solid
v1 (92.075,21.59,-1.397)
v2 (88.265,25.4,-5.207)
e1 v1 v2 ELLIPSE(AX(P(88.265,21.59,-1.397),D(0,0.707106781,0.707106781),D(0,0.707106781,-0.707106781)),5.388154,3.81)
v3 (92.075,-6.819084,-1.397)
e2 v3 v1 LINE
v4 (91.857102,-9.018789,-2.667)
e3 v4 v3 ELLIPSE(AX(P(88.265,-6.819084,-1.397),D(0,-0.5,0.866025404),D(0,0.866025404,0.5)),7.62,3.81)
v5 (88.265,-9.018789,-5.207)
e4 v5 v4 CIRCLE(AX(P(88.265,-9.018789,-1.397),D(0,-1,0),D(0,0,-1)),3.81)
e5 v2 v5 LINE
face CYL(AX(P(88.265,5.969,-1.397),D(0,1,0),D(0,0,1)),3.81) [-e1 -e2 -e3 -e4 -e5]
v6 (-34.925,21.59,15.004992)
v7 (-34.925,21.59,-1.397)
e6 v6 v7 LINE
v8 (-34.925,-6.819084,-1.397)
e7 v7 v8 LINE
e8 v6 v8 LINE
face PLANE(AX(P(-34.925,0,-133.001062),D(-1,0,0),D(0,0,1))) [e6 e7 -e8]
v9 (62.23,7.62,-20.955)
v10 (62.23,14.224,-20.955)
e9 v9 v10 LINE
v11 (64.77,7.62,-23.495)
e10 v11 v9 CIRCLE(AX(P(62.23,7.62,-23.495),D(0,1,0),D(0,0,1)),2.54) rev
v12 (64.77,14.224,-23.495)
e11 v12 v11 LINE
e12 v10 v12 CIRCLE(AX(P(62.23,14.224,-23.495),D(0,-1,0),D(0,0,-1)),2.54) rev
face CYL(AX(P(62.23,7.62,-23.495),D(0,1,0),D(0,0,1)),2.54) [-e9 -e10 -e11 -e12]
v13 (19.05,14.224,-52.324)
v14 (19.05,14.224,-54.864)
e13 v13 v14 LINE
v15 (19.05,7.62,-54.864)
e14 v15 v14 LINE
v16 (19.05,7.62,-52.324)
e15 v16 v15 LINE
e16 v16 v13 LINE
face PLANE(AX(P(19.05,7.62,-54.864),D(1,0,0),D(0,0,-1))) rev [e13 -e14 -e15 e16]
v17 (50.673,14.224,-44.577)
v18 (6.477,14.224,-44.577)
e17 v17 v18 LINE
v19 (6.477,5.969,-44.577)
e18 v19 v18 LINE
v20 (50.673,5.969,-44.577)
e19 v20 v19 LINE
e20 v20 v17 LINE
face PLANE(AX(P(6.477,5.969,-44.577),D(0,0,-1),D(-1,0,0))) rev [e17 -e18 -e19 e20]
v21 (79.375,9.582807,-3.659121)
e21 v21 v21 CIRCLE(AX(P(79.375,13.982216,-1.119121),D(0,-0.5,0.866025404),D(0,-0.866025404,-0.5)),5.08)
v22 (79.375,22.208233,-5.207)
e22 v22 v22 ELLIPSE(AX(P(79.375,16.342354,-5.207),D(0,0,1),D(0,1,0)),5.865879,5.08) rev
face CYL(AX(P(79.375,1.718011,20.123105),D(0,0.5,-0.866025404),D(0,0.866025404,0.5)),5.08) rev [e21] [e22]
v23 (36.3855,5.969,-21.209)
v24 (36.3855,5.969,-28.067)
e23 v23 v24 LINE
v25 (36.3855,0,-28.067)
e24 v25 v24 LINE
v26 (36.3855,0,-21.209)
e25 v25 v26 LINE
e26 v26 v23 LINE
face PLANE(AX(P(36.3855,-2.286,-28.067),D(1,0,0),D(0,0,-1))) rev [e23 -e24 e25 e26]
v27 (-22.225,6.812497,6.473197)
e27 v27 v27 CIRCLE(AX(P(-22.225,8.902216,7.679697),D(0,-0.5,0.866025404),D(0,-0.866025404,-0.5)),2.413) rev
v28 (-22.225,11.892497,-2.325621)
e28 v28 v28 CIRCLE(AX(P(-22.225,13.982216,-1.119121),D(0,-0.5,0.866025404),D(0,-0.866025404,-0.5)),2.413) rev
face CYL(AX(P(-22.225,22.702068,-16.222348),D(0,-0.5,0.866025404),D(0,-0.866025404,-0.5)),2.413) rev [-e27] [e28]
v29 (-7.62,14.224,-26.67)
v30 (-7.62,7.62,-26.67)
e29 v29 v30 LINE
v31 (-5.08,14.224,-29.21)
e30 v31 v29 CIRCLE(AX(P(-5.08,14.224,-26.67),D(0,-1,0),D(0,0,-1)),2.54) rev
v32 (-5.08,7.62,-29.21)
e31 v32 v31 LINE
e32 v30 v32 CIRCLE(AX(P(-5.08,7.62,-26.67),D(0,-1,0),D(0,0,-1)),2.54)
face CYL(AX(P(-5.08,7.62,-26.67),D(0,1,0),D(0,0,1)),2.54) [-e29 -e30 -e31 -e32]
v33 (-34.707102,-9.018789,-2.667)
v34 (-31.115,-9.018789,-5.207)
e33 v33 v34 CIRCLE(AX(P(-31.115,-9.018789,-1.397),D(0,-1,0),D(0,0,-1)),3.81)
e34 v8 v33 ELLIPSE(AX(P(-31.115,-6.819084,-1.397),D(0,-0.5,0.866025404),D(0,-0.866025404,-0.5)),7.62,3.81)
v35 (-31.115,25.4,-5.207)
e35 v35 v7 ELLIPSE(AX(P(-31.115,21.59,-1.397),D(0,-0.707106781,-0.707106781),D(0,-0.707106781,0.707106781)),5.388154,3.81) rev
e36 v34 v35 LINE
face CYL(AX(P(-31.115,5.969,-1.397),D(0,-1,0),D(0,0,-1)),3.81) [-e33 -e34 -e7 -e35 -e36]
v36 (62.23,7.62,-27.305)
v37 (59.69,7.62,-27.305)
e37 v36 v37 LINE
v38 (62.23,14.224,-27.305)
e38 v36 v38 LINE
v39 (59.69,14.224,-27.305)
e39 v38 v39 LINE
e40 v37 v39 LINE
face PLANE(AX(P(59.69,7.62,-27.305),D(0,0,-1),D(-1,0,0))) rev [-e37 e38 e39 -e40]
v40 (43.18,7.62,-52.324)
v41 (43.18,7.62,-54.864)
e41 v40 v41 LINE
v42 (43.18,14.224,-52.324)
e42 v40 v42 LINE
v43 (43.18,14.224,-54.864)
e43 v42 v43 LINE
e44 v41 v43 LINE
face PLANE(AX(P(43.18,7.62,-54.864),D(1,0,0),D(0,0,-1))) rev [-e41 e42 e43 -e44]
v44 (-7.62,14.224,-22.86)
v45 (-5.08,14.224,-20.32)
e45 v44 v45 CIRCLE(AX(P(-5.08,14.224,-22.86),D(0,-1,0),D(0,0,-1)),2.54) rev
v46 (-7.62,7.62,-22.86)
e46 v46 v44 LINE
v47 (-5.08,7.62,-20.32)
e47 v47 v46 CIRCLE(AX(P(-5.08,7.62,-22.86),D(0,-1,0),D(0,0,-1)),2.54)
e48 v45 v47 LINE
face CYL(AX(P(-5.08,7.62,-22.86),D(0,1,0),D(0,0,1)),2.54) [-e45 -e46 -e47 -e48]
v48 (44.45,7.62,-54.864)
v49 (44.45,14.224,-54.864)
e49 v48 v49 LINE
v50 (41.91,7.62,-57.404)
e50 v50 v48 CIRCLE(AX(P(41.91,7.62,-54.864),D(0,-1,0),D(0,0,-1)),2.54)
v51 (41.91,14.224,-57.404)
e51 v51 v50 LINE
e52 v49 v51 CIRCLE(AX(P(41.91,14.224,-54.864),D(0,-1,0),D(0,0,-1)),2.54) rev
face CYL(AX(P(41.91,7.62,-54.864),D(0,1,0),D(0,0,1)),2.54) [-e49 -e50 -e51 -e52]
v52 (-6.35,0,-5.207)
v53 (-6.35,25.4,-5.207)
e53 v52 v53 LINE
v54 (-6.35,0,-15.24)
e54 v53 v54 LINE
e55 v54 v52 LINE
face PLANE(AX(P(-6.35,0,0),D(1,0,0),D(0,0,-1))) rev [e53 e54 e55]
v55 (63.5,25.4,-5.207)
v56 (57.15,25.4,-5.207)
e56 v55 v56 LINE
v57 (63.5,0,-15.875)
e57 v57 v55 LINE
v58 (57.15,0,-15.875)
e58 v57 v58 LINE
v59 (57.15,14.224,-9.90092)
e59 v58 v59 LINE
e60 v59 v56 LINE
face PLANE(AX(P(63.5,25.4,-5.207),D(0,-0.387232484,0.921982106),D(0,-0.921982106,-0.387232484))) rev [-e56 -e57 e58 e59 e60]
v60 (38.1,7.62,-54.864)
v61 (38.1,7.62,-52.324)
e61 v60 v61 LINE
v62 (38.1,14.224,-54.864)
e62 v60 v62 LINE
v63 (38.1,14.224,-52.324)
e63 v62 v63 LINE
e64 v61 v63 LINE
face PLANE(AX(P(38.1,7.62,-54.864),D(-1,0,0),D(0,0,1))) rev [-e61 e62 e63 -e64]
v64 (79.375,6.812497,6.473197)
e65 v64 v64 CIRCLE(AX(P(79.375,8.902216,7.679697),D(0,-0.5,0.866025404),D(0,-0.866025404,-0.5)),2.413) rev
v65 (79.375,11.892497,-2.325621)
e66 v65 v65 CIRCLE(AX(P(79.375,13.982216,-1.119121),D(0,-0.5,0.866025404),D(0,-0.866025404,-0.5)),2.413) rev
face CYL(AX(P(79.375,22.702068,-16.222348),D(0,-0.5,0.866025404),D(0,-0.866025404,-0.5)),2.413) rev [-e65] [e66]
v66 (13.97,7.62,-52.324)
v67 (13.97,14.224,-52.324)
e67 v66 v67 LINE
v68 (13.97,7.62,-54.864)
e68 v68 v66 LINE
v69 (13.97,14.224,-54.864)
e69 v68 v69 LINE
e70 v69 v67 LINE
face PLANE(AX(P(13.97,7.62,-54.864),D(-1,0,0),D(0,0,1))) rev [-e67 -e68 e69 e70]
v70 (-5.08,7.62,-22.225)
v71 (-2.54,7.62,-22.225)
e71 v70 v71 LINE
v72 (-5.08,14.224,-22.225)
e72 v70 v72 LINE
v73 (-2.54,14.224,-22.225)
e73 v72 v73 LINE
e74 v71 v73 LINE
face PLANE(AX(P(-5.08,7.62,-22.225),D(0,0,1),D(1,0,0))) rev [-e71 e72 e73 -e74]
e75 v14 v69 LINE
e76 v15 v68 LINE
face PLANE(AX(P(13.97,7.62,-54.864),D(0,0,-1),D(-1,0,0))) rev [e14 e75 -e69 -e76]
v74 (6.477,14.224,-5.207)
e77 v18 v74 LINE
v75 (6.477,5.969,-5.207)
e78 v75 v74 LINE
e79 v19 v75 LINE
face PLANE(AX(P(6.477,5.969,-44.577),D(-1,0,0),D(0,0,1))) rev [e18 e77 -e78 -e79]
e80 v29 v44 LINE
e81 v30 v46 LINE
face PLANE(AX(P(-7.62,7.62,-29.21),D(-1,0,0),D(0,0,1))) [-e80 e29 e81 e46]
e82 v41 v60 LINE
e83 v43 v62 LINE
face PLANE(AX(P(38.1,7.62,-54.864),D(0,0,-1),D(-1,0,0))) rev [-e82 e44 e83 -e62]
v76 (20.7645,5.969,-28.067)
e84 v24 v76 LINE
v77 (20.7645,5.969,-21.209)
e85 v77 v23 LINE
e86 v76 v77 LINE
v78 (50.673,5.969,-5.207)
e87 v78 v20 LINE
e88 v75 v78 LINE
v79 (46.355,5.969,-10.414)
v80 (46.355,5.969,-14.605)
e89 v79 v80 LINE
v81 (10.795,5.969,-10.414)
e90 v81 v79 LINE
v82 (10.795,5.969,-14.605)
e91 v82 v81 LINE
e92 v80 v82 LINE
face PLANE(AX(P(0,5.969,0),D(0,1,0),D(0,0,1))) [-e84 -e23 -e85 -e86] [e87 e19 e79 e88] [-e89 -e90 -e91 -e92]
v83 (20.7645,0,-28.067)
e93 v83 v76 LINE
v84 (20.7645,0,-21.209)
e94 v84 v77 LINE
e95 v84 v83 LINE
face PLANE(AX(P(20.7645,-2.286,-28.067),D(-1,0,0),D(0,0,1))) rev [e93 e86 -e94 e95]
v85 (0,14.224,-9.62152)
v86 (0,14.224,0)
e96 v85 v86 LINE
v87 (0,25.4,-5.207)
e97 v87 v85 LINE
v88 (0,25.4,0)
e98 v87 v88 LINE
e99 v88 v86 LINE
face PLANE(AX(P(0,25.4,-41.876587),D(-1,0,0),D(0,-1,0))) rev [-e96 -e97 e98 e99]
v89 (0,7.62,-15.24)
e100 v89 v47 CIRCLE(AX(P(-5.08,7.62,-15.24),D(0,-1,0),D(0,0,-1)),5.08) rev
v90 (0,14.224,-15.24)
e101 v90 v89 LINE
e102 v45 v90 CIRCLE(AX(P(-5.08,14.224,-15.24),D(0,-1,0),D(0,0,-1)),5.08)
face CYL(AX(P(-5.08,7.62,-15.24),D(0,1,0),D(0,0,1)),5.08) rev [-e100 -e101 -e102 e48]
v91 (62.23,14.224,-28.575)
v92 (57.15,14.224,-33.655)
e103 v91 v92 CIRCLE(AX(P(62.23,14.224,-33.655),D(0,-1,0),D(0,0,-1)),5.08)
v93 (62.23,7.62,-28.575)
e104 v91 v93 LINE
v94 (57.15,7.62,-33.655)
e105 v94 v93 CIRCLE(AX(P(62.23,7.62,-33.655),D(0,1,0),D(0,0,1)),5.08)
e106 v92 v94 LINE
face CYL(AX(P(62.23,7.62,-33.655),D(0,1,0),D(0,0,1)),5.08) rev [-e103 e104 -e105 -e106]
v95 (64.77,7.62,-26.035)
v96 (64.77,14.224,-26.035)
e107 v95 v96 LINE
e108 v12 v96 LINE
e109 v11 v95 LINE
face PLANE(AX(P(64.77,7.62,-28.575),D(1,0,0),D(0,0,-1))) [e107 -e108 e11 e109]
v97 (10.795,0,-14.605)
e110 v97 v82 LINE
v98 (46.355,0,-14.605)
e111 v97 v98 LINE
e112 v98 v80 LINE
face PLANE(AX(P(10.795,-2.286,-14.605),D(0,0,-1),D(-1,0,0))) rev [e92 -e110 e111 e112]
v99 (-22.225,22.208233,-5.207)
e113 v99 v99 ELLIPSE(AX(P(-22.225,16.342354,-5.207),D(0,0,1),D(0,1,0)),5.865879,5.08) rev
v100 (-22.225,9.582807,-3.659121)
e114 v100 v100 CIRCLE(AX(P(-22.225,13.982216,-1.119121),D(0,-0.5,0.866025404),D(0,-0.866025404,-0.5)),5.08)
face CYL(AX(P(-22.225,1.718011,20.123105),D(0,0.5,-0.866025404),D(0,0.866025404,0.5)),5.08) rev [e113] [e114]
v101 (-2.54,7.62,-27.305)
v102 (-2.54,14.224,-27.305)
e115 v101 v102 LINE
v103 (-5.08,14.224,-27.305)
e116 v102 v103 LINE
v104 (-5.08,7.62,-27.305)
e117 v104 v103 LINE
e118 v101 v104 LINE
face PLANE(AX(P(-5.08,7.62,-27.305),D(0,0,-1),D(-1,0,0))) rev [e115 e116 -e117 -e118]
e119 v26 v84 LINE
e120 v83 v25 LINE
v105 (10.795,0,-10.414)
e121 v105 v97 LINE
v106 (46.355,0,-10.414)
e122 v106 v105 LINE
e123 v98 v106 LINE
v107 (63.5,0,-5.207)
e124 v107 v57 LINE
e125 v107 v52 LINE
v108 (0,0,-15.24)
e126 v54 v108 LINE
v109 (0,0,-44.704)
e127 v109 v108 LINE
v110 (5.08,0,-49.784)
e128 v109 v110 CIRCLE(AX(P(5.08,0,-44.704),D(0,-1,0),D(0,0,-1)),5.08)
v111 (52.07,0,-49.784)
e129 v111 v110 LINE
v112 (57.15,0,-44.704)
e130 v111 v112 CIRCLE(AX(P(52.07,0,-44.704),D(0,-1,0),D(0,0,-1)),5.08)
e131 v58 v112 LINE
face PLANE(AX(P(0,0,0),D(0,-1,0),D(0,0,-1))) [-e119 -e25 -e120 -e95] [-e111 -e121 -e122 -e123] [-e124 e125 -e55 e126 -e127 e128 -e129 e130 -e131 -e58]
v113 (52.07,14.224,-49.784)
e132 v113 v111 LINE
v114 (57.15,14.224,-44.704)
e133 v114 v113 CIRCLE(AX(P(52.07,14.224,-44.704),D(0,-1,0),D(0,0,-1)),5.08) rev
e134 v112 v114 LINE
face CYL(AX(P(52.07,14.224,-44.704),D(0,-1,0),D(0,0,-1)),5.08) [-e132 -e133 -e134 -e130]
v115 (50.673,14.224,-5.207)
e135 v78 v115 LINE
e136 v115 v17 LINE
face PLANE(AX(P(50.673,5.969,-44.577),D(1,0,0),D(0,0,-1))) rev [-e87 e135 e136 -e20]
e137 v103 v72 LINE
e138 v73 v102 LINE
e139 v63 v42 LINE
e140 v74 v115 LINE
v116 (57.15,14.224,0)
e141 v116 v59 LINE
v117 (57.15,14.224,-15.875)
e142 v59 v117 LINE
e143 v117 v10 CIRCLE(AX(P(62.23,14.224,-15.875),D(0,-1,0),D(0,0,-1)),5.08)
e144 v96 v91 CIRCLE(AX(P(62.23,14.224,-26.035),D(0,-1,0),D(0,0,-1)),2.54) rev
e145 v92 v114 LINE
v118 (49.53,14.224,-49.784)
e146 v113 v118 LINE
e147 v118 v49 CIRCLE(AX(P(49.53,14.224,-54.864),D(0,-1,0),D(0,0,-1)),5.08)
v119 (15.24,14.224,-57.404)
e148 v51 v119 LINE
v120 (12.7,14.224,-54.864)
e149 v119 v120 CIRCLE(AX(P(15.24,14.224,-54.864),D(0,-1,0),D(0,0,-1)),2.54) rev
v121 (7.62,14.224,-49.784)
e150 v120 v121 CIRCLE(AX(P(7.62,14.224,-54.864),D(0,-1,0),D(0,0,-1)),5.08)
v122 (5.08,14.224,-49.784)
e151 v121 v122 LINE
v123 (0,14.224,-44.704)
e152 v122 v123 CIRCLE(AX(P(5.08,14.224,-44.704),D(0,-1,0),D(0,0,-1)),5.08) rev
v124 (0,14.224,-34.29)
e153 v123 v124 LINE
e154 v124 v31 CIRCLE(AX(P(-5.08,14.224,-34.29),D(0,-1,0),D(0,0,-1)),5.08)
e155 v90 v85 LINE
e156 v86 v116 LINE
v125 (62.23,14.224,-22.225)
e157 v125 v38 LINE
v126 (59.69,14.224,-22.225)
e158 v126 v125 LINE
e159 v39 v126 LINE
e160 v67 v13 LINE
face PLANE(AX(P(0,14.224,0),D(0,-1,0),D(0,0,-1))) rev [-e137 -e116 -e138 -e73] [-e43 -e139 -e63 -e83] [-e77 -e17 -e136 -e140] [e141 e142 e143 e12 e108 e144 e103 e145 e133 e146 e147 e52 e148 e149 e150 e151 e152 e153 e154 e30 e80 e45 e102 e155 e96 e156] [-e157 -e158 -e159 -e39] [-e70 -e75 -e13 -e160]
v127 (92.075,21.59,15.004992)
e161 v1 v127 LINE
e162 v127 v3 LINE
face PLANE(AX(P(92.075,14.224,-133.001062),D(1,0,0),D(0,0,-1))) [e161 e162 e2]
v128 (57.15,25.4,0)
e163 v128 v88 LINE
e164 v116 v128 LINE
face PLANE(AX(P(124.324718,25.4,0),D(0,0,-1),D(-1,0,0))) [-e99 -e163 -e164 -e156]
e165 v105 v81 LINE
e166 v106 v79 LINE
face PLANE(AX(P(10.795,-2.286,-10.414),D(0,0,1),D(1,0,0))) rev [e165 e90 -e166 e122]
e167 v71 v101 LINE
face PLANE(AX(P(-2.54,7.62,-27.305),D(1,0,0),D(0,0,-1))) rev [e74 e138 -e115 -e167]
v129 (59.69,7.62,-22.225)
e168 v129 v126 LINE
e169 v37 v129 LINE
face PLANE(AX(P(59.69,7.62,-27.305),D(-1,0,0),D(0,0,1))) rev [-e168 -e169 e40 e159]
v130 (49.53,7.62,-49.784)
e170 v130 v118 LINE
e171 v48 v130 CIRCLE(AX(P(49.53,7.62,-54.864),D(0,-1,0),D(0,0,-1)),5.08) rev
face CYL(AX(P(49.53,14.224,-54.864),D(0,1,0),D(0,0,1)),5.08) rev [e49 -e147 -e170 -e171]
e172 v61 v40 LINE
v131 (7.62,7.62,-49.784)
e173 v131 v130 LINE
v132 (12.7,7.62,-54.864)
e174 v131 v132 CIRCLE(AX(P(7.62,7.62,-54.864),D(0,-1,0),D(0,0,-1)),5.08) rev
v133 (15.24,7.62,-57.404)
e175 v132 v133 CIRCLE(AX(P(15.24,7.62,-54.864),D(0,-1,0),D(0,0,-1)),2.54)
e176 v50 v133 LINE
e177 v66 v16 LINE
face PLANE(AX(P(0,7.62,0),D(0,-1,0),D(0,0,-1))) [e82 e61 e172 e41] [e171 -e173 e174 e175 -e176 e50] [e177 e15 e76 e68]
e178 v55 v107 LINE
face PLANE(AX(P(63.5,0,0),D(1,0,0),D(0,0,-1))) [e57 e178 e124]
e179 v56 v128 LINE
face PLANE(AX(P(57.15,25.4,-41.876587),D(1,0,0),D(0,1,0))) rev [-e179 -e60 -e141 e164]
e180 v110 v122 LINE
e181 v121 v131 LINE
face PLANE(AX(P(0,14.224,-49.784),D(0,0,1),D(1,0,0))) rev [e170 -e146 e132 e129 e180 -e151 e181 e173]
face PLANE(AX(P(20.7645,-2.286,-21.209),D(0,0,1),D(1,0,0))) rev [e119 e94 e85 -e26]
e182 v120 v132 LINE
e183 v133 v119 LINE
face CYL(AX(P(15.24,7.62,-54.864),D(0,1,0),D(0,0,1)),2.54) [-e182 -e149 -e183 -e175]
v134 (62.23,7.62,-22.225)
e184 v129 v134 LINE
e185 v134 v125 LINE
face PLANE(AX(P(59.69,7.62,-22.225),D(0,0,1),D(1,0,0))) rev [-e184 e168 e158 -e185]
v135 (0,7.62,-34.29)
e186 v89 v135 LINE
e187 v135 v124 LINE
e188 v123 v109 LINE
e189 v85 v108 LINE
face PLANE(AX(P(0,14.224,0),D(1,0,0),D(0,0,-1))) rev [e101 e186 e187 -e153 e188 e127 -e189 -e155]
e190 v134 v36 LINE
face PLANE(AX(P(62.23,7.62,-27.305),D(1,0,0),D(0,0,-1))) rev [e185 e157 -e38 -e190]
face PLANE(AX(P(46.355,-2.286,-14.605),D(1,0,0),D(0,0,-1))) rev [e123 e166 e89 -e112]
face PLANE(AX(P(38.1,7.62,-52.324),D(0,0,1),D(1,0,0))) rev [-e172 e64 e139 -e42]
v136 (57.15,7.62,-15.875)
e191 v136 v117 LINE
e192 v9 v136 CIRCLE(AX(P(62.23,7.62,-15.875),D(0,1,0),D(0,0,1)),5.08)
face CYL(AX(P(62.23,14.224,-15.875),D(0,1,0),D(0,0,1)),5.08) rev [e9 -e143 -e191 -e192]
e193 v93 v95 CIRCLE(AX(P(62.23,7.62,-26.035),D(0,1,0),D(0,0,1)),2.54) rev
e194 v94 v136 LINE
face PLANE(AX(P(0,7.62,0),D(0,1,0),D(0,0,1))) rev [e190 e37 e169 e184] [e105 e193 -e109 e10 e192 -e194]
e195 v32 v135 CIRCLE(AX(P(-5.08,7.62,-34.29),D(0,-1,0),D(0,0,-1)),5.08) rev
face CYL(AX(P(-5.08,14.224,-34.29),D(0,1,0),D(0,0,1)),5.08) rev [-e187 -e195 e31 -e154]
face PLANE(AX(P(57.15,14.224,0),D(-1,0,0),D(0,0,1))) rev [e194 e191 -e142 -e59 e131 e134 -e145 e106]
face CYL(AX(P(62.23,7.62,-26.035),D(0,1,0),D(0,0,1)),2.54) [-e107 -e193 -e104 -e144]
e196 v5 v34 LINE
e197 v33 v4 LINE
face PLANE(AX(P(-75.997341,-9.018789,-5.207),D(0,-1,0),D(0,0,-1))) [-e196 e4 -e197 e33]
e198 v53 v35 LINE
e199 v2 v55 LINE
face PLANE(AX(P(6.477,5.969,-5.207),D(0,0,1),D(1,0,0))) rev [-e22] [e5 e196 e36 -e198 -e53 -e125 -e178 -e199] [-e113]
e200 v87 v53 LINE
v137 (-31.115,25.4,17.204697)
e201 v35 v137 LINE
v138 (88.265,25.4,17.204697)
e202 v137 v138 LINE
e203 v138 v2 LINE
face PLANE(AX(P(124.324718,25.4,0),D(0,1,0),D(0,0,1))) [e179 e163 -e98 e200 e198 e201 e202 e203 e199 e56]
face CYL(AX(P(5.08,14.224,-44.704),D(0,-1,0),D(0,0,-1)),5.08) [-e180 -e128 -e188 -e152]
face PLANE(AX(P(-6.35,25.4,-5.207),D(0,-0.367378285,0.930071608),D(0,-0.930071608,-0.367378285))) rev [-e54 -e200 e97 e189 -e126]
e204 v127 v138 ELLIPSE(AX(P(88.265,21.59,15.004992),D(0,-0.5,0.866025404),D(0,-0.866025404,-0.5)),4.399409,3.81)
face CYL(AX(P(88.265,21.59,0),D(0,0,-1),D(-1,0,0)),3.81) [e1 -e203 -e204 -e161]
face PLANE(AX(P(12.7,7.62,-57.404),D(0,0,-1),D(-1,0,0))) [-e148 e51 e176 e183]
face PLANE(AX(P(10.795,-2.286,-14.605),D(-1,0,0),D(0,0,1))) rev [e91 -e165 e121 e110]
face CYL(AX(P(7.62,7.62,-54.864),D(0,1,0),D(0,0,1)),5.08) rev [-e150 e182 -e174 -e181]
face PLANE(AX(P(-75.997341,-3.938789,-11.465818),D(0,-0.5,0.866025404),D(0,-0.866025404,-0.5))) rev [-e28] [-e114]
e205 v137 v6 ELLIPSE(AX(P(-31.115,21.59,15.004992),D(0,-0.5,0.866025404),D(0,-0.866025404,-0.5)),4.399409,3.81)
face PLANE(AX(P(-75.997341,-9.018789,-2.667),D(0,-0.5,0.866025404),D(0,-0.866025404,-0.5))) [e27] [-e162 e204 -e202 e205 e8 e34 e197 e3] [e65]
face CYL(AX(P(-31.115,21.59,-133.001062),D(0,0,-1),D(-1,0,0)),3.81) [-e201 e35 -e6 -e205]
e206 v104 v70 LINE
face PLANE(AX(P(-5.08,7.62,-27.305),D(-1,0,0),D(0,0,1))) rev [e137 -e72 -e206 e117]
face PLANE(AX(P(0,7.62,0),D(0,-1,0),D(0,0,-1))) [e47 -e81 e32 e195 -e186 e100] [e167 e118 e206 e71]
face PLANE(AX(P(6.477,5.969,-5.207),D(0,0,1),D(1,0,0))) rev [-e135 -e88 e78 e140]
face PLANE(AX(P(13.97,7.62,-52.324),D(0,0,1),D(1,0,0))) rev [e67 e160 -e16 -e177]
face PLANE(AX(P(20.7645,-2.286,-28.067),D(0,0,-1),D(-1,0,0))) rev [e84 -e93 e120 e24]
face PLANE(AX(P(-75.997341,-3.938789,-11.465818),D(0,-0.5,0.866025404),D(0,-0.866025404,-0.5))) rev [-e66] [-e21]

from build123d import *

# Parameters (mm, degrees)
SKETCH2_W           = 57.15
SKETCH2_H           = 49.784
BOSS_EXTRUDE1_DEPTH = 14.224
SKETCH3_W           = 44.196
SKETCH3_H           = 39.37
CUT_EXTRUDE1_DEPTH  = 8.255
SKETCH4_W           = 35.56
SKETCH4_H           = 4.191
SKETCH4_W_2         = 15.621
SKETCH4_H_2         = 6.858
CUT_EXTRUDE2_DEPTH  = 8.255
SKETCH5_W           = 7.62
SKETCH5_H           = 8.89
SKETCH5_H_2         = 7.62
BOSS_EXTRUDE2_DEPTH = 6.604
SKETCH6_W           = 2.54
SKETCH6_H           = 5.08
SKETCH6_W_2         = 5.08
SKETCH6_H_2         = 2.54
CUT_EXTRUDE3_DEPTH  = 6.604
FILLET1_R           = 5.08
FILLET2_R           = 2.54
SKETCH7_W           = 127
SKETCH7_H           = 14.224
SKETCH7_R           = 2.38125
BOSS_EXTRUDE3_DEPTH = 5.207
BOSS_EXTRUDE4_DEPTH = 127
SKETCH11_W          = 34.925
SKETCH11_H          = 11.176
BOSS_EXTRUDE5_DEPTH = 5.207
SKETCH9_R           = 2.413
CUT_EXTRUDE4_DEPTH  = 25.4
FILLET3_R           = 5.08
FILLET4_R           = 5.08
BOSS_EXTRUDE6_DEPTH = 6.35
BOSS_EXTRUDE7_DEPTH = 6.35
BOSS_EXTRUDE8_DEPTH = 127
BOSS_EXTRUDE9_DEPTH = 127
CUT_EXTRUDE6_START  = -2.199704526
SKETCH16_R          = 2.413
CUT_EXTRUDE6_DEPTH  = 2.199704526
CUT_EXTRUDE9_START  = -17.813215
SKETCH17_R          = 5.08
CUT_EXTRUDE9_DEPTH  = 7.653215
FILLET5_R           = 3.81


with BuildPart() as part:
    # Sketch2 → Boss-Extrude1 (new body)
    with BuildSketch(Plane(origin=(0, 0, 0), x_dir=(1, 0, 0), z_dir=(0, 1, 0))):
        with Locations((28.575, 24.892)):
            Rectangle(SKETCH2_W, SKETCH2_H)
    extrude(amount=BOSS_EXTRUDE1_DEPTH)

    # Sketch3 → Cut-Extrude1 (cut)
    with BuildSketch(Plane(origin=(0, 14.224, 0), x_dir=(1, 0, 0), z_dir=(0, 1, 0))):
        with Locations((28.575, 24.892)):
            Rectangle(SKETCH3_W, SKETCH3_H)
    extrude(amount=-CUT_EXTRUDE1_DEPTH, mode=Mode.SUBTRACT)

    # Sketch4 → Cut-Extrude2 (cut)
    with BuildSketch(Plane(origin=(0, 5.969, 0), x_dir=(1, 0, 0), z_dir=(0, 1, 0))):
        with Locations((28.575, 12.5095)):
            Rectangle(SKETCH4_W, SKETCH4_H)
        with Locations((28.575, 24.638)):
            Rectangle(SKETCH4_W_2, SKETCH4_H_2)
    extrude(amount=-CUT_EXTRUDE2_DEPTH, mode=Mode.SUBTRACT)

    # Sketch5 → Boss-Extrude2 (add)
    with BuildSketch(Plane(origin=(0, 14.224, 0), x_dir=(1, 0, 0), z_dir=(0, 1, 0))):
        with Locations((-3.81, 24.765)):
            Rectangle(SKETCH5_W, SKETCH5_H)
        Polygon((12.7, 49.784), (36.83, 49.784), (44.45, 49.784), (44.45, 57.404), (36.83, 57.404), (12.7, 57.404), align=None)
        with Locations((60.96, 24.765)):
            Rectangle(SKETCH5_W, SKETCH5_H_2)
    extrude(amount=-BOSS_EXTRUDE2_DEPTH)

    # Sketch6 → Cut-Extrude3 (cut)
    with BuildSketch(Plane(origin=(0, 14.224, 0), x_dir=(1, 0, 0), z_dir=(0, 1, 0))):
        with Locations((-3.81, 24.765)):
            Rectangle(SKETCH6_W, SKETCH6_H)
        with Locations((60.96, 24.765)):
            Rectangle(SKETCH6_W, SKETCH6_H)
        with Locations((16.51, 53.594)):
            Rectangle(SKETCH6_W_2, SKETCH6_H_2)
        with Locations((40.64, 53.594)):
            Rectangle(SKETCH6_W_2, SKETCH6_H_2)
    extrude(amount=-CUT_EXTRUDE3_DEPTH, mode=Mode.SUBTRACT)

    # Fillet1
    fillet1_edges = [part.edges().sort_by_distance(p)[0] for p in [
        (0, 7.112, -49.784),
        (57.15, 7.112, -49.784),
        (57.15, 7.112, 0),
        (0, 7.112, 0),
    ]]
    fillet(fillet1_edges, radius=FILLET1_R)

    # Fillet2
    fillet2_edges = [part.edges().sort_by_distance(p)[0] for p in [
        (-7.62, 10.922, -20.32),
        (-7.62, 10.922, -29.21),
        (12.7, 10.922, -57.404),
        (44.45, 10.922, -57.404),
        (64.77, 10.922, -28.575),
        (64.77, 10.922, -20.955),
    ]]
    fillet(fillet2_edges, radius=FILLET2_R)

    # Sketch7 → Boss-Extrude3 (add)
    with BuildSketch(Plane.XY):
        with Locations((28.575, 7.112)):
            Rectangle(SKETCH7_W, SKETCH7_H)
        with Locations((-30.861, 7.112)):
            Circle(SKETCH7_R, mode=Mode.SUBTRACT)
        with Locations((88.011, 7.112)):
            Circle(SKETCH7_R, mode=Mode.SUBTRACT)
    extrude(amount=-BOSS_EXTRUDE3_DEPTH)

    # Sketch8 → Boss-Extrude4 (add)
    with BuildSketch(Plane.ZY.offset(34.925)):
        Polygon((0, 25.4), (14.664696837, 25.4), (0, 0), (-5.207, 0), (-5.207, 14.224), (0, 14.224), align=None)
    extrude(amount=-BOSS_EXTRUDE4_DEPTH)

    # Sketch11 → Boss-Extrude5 (add)
    with BuildSketch(Plane(origin=(0, 0, 0), x_dir=(-1, 0, 0), z_dir=(0, 0, -1))):
        with Locations((17.4625, 19.812)):
            Rectangle(SKETCH11_W, SKETCH11_H)
        with Locations((-74.6125, 19.812)):
            Rectangle(SKETCH11_W, SKETCH11_H)
    extrude(amount=BOSS_EXTRUDE5_DEPTH)

    # Sketch9 → Cut-Extrude4 (cut, symmetric)
    with BuildSketch(Plane(origin=(0, 0, 0), x_dir=(1, 0, 0), z_dir=(0, -0.5000000000000043, 0.8660254037844363))):
        with Locations(Location((-22.225, 11.549393675, 0), (0, 0, 270))):
            Circle(SKETCH9_R)
        with Locations(Location((79.375, 11.549393675, 0), (0, 0, 270))):
            Circle(SKETCH9_R)
    extrude(amount=CUT_EXTRUDE4_DEPTH, both=True, mode=Mode.SUBTRACT)

    # Fillet3
    fillet3_edges = [part.edges().sort_by_distance(p)[0] for p in [
        (44.45, 10.922, -49.784),
        (12.7, 10.922, -49.784),
    ]]
    fillet(fillet3_edges, radius=FILLET3_R - 0.0001)  # a hair under: the kernel refuses the full size

    # Fillet4
    fillet4_edges = [part.edges().sort_by_distance(p)[0] for p in [
        (57.15, 10.922, -20.955),
        (57.15, 10.922, -28.575),
        (0, 10.922, -29.21),
        (0, 10.922, -20.32),
    ]]
    fillet(fillet4_edges, radius=FILLET4_R - 0.0001)  # a hair under: the kernel refuses the full size

    # Sketch12 → Boss-Extrude6 (add)
    with BuildSketch(Plane.ZY):
        Polygon((-5.207, 25.4), (-15.24, 0), (-5.207, 0), align=None)
    extrude(amount=BOSS_EXTRUDE6_DEPTH)

    # Sketch13 → Boss-Extrude7 (add)
    with BuildSketch(Plane(origin=(57.15, 0, 0), x_dir=(0, 0, -1), z_dir=(1, 0, 0))):
        Polygon((5.207, 25.4), (15.875, 0), (5.207, 0), align=None)
    extrude(amount=BOSS_EXTRUDE7_DEPTH)

    # Sketch14 → Boss-Extrude8 (add)
    with BuildSketch(Plane.ZY.offset(34.925)):
        Polygon((-5.207, 0), (-5.207, -9.018788555), (0, 0), align=None)
    extrude(amount=-BOSS_EXTRUDE8_DEPTH)

    # Sketch15 → Boss-Extrude9 (add)
    with BuildSketch(Plane(origin=(92.075, 0, 0), x_dir=(0, 0, -1), z_dir=(1, 0, 0))):
        Polygon((5.207, -9.018788555), (2.667, -9.018788555), (-17.204696837, 25.4), (-14.664696837, 25.4), align=None)
    extrude(amount=-BOSS_EXTRUDE9_DEPTH)

    # Sketch16 → Cut-Extrude6 (cut)
    with BuildSketch(Plane(origin=(0, 0, 0), x_dir=(-1, 0, 0), z_dir=(0, 0.5000000000000031, -0.8660254037844369)).offset(CUT_EXTRUDE6_START)):
        with Locations(Location((-79.375, 11.549393675, 0), (0, 0, 270))):
            Circle(SKETCH16_R)
        with Locations(Location((22.225, 11.549393675, 0), (0, 0, 270))):
            Circle(SKETCH16_R)
    extrude(amount=CUT_EXTRUDE6_DEPTH, mode=Mode.SUBTRACT)

    # Sketch17 → Cut-Extrude9 (cut)
    with BuildSketch(Plane(origin=(0, -1.099852263, 1.905), x_dir=(1, 0, 0), z_dir=(0, -0.500000000000003, 0.8660254037844369)).offset(CUT_EXTRUDE9_START)):
        with Locations(Location((79.375, 11.549393675, 0), (0, 0, 90))):
            Circle(SKETCH17_R)
        with Locations(Location((-22.225, 11.549393675, 0), (0, 0, 90))):
            Circle(SKETCH17_R)
    extrude(amount=CUT_EXTRUDE9_DEPTH, mode=Mode.SUBTRACT)

    # Fillet5
    fillet5_edges = [part.edges().sort_by_distance(p)[0] for p in [
        (92.075, 25.4, 5.998848419),
        (92.075, 8.190605722, -5.207),
        (-34.925, 25.4, 5.998848419),
        (-34.925, 8.190605722, -5.207),
    ]]
    fillet(fillet5_edges, radius=FILLET5_R)


solid = part.part
